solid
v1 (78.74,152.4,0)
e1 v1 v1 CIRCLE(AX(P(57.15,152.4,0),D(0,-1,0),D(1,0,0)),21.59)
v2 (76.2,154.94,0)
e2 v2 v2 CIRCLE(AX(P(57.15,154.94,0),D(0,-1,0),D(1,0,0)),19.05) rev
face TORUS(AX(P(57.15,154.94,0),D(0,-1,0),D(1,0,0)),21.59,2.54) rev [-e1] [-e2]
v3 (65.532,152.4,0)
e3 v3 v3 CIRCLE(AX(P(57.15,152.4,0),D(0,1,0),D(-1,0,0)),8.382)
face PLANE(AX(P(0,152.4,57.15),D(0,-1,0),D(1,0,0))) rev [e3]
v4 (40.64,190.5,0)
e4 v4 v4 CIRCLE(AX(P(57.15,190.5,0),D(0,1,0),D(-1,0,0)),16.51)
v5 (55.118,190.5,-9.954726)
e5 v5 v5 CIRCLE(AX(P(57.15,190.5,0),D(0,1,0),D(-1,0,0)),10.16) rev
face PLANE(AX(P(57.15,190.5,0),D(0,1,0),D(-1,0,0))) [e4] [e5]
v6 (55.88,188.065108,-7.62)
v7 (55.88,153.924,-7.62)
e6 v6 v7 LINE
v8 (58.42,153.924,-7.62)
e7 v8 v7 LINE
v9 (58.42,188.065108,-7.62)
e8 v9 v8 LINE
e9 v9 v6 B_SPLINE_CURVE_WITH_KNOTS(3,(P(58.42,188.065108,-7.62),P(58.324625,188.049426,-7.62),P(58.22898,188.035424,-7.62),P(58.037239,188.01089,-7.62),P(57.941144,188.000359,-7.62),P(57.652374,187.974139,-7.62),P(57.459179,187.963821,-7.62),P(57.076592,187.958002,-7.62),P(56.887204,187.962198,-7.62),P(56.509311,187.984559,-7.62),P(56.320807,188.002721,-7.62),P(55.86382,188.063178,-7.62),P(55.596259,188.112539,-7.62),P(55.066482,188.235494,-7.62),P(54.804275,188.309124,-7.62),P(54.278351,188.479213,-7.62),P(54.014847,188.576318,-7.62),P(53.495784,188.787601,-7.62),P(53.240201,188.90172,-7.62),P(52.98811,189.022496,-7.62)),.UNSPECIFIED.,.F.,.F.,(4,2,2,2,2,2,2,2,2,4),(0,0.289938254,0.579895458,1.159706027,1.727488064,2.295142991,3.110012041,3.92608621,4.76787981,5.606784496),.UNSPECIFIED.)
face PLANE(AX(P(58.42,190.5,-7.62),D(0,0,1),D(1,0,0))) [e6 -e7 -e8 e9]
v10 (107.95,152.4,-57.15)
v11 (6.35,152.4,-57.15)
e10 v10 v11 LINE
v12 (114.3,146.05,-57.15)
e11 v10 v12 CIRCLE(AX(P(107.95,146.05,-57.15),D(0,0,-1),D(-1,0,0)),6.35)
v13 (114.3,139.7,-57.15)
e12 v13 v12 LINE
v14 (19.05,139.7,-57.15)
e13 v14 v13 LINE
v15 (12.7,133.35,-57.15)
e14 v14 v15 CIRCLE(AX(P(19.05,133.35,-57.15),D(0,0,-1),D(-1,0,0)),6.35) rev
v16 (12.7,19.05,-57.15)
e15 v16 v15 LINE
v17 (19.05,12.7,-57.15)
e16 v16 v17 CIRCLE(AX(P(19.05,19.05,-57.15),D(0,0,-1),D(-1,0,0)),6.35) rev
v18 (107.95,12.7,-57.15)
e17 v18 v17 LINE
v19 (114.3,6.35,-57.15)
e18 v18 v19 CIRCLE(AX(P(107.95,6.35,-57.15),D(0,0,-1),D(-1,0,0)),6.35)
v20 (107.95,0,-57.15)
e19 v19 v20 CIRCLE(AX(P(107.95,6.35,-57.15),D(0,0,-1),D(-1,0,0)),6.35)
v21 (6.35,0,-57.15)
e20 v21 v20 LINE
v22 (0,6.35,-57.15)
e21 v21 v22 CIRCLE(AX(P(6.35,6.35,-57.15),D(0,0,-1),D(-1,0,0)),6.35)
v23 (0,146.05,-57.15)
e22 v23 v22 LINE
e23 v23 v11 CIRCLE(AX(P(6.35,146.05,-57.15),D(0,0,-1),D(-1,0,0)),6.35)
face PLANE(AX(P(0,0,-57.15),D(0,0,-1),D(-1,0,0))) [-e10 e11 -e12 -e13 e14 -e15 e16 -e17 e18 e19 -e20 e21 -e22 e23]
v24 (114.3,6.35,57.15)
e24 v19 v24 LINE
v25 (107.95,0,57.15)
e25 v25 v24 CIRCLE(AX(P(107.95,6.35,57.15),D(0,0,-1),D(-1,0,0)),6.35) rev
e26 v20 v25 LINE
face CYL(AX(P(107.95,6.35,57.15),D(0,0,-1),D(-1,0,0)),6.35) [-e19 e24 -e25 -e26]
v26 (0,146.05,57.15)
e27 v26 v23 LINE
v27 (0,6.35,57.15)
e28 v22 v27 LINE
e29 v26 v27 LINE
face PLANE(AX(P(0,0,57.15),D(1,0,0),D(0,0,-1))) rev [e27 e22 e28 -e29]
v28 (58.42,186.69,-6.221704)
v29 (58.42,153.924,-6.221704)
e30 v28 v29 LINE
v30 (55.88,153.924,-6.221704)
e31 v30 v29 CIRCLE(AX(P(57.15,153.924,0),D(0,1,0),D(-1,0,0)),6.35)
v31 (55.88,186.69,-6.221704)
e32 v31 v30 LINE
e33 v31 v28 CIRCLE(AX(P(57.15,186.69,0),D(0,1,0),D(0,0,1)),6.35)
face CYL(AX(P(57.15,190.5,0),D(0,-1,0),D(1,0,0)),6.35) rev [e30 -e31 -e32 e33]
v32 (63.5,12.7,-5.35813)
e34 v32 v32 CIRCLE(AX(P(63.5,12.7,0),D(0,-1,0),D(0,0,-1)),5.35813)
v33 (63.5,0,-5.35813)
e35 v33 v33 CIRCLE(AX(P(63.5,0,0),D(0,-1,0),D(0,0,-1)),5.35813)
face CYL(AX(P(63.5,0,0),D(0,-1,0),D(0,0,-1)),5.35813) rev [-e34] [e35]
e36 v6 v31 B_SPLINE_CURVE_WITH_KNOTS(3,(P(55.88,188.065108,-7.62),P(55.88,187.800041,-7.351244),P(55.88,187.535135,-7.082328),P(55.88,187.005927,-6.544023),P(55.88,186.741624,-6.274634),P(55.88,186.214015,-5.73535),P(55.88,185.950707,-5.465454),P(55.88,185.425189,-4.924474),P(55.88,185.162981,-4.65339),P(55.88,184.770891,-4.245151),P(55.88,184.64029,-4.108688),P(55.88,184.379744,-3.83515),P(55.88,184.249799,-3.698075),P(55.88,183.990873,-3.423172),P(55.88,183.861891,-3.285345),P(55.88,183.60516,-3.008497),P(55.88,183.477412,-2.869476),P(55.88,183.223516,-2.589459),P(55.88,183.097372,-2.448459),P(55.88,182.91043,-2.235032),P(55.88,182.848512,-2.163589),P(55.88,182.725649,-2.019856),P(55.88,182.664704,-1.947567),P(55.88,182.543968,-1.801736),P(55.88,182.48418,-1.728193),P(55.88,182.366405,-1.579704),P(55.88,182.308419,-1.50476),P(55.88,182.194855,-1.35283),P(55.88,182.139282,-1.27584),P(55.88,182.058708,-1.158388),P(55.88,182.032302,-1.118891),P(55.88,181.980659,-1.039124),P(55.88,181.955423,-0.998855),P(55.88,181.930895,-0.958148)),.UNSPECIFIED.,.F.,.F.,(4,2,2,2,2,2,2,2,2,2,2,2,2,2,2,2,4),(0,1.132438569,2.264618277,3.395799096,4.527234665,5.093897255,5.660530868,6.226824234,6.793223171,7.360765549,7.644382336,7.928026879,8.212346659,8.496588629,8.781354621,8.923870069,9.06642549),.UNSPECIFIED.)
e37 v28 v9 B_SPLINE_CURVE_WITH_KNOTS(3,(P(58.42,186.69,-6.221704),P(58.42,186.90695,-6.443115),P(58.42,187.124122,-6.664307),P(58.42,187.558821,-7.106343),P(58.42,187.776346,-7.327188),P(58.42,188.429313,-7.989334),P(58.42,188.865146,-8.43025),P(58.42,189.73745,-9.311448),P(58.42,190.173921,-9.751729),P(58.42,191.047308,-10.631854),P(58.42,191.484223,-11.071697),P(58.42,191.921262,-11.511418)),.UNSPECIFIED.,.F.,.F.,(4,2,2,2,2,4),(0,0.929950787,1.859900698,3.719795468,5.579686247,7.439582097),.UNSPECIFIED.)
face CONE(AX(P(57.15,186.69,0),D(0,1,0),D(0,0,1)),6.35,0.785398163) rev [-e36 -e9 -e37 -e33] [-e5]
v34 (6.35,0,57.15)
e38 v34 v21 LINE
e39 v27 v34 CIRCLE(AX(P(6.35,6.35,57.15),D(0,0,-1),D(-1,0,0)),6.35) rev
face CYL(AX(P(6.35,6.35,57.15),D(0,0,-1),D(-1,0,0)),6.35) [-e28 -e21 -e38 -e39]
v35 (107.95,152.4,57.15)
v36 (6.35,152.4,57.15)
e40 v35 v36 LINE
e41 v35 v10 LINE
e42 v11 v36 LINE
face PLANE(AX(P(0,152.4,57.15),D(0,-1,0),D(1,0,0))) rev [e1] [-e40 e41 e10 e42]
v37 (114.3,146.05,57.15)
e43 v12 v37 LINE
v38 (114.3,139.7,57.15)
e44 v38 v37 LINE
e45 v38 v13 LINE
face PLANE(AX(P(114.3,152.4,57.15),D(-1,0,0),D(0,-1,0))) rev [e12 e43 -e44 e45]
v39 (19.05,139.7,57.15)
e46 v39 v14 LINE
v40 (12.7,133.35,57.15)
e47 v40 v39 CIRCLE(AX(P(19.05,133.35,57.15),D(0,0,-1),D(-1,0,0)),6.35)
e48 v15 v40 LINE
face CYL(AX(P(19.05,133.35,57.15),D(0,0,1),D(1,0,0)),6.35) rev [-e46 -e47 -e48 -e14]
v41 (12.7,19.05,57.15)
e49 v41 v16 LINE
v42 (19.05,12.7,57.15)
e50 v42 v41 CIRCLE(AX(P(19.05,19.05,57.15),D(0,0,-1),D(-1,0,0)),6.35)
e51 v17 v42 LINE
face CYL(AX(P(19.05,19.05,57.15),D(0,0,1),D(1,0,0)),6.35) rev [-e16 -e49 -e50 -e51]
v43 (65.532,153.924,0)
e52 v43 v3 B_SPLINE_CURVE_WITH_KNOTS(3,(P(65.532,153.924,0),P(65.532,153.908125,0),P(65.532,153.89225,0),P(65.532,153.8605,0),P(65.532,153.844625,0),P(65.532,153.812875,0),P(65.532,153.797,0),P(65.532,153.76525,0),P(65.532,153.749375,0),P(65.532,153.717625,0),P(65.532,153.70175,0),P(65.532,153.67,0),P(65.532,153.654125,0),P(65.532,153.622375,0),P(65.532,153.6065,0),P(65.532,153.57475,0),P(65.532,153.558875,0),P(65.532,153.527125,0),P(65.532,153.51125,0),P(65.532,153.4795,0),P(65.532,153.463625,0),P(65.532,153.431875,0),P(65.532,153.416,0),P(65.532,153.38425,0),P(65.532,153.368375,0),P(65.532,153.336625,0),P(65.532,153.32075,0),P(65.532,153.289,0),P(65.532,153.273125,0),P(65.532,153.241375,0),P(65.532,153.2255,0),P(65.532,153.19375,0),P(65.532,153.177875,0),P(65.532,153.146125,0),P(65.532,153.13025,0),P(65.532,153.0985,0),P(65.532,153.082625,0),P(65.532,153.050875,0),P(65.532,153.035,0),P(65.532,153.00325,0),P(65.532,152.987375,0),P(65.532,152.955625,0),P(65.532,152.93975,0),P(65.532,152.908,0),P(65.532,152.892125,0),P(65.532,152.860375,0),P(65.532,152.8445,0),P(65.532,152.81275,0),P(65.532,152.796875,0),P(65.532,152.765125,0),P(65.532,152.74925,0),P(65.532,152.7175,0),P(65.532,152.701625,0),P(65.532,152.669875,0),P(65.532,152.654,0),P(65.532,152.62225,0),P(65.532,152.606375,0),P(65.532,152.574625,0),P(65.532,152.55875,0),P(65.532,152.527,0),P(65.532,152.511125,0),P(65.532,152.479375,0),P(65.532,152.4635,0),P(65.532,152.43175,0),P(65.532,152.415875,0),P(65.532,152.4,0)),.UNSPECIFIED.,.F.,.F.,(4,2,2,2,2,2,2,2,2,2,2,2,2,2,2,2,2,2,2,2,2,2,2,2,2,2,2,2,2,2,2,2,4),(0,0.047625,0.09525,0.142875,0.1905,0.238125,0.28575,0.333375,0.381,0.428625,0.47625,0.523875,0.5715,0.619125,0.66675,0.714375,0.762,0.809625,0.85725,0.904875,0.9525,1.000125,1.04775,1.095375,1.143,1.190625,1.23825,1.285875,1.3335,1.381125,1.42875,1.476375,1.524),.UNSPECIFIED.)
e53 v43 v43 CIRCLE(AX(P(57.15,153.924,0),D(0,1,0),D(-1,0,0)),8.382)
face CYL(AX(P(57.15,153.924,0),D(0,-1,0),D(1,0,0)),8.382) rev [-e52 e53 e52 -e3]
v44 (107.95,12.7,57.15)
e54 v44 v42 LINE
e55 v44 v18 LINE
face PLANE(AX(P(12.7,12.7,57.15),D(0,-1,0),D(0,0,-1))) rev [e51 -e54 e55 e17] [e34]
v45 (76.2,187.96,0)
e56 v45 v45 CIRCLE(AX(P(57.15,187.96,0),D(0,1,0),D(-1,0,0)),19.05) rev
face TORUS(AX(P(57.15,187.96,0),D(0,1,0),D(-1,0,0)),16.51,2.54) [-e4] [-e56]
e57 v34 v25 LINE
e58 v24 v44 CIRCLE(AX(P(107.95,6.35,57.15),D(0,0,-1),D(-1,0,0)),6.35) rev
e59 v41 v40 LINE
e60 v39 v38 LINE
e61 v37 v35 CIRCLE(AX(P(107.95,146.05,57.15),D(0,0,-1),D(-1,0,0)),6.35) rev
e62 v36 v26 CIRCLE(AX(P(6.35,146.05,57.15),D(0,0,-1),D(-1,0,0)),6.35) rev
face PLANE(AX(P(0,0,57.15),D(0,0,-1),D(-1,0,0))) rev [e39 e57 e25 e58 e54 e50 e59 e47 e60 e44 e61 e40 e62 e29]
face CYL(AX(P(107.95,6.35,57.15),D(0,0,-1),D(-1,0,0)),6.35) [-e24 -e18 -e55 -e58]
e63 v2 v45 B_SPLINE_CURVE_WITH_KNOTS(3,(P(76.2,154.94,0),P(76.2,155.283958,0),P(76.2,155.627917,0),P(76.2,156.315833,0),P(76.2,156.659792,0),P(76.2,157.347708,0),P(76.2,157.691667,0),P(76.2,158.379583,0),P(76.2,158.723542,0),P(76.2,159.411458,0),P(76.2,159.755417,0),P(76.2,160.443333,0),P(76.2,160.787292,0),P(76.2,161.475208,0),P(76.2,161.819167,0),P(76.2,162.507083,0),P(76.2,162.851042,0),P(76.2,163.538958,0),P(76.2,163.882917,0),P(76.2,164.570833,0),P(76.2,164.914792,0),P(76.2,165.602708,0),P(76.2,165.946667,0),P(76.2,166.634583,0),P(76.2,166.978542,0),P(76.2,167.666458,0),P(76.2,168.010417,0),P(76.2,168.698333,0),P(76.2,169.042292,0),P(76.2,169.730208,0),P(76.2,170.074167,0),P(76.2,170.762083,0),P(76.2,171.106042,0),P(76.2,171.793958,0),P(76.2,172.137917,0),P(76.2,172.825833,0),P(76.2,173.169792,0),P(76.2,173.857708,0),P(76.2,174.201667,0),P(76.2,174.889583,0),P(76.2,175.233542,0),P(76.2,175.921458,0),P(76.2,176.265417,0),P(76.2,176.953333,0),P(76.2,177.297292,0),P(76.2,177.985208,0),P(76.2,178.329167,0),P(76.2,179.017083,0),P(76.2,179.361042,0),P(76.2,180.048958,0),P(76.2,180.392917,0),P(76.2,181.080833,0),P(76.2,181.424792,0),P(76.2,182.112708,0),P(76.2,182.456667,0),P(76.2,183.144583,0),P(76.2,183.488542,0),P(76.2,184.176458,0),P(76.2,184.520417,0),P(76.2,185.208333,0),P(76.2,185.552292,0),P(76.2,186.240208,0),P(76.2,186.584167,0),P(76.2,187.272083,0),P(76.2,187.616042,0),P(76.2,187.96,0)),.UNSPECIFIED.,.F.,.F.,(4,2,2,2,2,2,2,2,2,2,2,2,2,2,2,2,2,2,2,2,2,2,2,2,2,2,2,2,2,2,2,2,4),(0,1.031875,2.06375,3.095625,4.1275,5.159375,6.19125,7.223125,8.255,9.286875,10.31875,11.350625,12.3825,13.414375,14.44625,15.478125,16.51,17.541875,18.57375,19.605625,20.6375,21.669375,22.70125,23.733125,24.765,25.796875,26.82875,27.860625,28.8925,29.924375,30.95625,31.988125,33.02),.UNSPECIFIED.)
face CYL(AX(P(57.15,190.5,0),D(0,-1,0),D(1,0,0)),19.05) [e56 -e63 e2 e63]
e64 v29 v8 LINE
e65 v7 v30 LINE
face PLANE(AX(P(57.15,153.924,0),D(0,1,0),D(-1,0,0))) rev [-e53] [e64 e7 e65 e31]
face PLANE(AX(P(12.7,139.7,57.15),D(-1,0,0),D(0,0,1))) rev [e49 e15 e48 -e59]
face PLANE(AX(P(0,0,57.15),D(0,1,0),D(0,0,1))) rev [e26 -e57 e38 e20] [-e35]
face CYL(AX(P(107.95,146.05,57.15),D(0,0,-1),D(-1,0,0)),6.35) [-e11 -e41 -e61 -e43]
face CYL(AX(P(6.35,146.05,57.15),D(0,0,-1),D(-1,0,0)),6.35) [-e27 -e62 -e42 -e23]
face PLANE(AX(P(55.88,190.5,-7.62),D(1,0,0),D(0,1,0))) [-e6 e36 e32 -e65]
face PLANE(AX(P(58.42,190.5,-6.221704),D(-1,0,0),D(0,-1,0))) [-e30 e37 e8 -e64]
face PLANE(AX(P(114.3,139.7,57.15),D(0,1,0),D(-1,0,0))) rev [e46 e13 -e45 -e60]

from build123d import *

# Parameters (mm, degrees)
BOSS_EXTRUDE1_DEPTH         = 57.15
FILLET1_R                   = 6.35
FILLET2_R                   = 6.35
FILLET3_R                   = 6.35
F_1_2_13_TAPPED_HOLE1_D     = 10.71626
F_1_2_13_TAPPED_HOLE1_DEPTH = 12.7
SKETCH7_R                   = 19.05
BOSS_EXTRUDE2_DEPTH         = 38.1
SKETCH8_R                   = 8.382
CUT_EXTRUDE1_DEPTH          = 1.524
FILLET4_R                   = 2.54


with BuildPart() as part:
    # Sketch1 → Boss-Extrude1 (new, symmetric)
    with BuildSketch(Plane.XY):
        Polygon((0, 0), (0, 152.4), (114.3, 152.4), (114.3, 139.7), (12.7, 139.7), (12.7, 12.7), (114.3, 12.7), (114.3, 0), align=None)
    extrude(amount=BOSS_EXTRUDE1_DEPTH, both=True)

    # Fillet1
    fillet1_edges = [part.edges().sort_by_distance(p)[0] for p in [
        (12.7, 139.7, 0),
        (12.7, 12.7, 0),
    ]]
    fillet(fillet1_edges, radius=FILLET1_R)

    # Fillet2
    fillet2_edges = [part.edges().sort_by_distance(p)[0] for p in [
        (0, 0, 0),
        (0, 152.4, 0),
    ]]
    fillet(fillet2_edges, radius=FILLET2_R)

    # Fillet3
    fillet3_edges = [part.edges().sort_by_distance(p)[0] for p in [
        (114.3, 152.4, 0),
        (114.3, 12.7, 0),
        (114.3, 0, 0),
    ]]
    fillet(fillet3_edges, radius=FILLET3_R - 0.0001)  # a hair under: the kernel refuses the full size

    # 1/2-13 Tapped Hole1
    with Locations(Plane(origin=(0, 0, 0), x_dir=(-1, 0, 0), z_dir=(0, -1, 0))):
        with Locations((-63.5, 0)):
            Hole(F_1_2_13_TAPPED_HOLE1_D / 2, depth=F_1_2_13_TAPPED_HOLE1_DEPTH)

    # Sketch7 → Boss-Extrude2 (add)
    with BuildSketch(Plane(origin=(0, 152.4, 0), x_dir=(1, 0, 0), z_dir=(0, 1, 0))):
        with Locations((57.15, 0)):
            Circle(SKETCH7_R)
        with BuildLine():
            Line((58.42, 6.221703947), (58.42, 7.62))
            Line((58.42, 7.62), (55.88, 7.62))
            Line((55.88, 7.62), (55.88, 6.221703947))
            ThreePointArc((55.88, 6.221703947), (57.15, -6.35), (58.42, 6.221703947))
        make_face(mode=Mode.SUBTRACT)
    extrude(amount=BOSS_EXTRUDE2_DEPTH)

    # Sketch8 → Cut-Extrude1 (cut)
    with BuildSketch(Plane(origin=(0, 152.4, 0), x_dir=(1, 0, 0), z_dir=(0, 1, 0))):
        with Locations((57.15, 0)):
            Circle(SKETCH8_R)
    extrude(amount=CUT_EXTRUDE1_DEPTH, mode=Mode.SUBTRACT)

    # Fillet4
    fillet4_edges = [part.edges().sort_by_distance(p)[0] for p in [
        (38.1, 152.4, 0),
        (38.1, 190.5, 0),
    ]]
    fillet(fillet4_edges, radius=FILLET4_R)

    # Chamfer1: read off the stored shape, not the designer's step
    # Chamfer1 outline → Chamfer1 (revolve, cut)
    with BuildSketch(Plane(origin=(57.15, 0, 0), x_dir=(1, 0, 0), z_dir=(0, 0, 1))):
        Polygon((6.349999964, 190.5), (6.349999964, 186.689999964), (10.16, 190.5), align=None)
    revolve(axis=Axis((57.15, 0, 0), (0, 1, 0)), mode=Mode.SUBTRACT)


solid = part.part
